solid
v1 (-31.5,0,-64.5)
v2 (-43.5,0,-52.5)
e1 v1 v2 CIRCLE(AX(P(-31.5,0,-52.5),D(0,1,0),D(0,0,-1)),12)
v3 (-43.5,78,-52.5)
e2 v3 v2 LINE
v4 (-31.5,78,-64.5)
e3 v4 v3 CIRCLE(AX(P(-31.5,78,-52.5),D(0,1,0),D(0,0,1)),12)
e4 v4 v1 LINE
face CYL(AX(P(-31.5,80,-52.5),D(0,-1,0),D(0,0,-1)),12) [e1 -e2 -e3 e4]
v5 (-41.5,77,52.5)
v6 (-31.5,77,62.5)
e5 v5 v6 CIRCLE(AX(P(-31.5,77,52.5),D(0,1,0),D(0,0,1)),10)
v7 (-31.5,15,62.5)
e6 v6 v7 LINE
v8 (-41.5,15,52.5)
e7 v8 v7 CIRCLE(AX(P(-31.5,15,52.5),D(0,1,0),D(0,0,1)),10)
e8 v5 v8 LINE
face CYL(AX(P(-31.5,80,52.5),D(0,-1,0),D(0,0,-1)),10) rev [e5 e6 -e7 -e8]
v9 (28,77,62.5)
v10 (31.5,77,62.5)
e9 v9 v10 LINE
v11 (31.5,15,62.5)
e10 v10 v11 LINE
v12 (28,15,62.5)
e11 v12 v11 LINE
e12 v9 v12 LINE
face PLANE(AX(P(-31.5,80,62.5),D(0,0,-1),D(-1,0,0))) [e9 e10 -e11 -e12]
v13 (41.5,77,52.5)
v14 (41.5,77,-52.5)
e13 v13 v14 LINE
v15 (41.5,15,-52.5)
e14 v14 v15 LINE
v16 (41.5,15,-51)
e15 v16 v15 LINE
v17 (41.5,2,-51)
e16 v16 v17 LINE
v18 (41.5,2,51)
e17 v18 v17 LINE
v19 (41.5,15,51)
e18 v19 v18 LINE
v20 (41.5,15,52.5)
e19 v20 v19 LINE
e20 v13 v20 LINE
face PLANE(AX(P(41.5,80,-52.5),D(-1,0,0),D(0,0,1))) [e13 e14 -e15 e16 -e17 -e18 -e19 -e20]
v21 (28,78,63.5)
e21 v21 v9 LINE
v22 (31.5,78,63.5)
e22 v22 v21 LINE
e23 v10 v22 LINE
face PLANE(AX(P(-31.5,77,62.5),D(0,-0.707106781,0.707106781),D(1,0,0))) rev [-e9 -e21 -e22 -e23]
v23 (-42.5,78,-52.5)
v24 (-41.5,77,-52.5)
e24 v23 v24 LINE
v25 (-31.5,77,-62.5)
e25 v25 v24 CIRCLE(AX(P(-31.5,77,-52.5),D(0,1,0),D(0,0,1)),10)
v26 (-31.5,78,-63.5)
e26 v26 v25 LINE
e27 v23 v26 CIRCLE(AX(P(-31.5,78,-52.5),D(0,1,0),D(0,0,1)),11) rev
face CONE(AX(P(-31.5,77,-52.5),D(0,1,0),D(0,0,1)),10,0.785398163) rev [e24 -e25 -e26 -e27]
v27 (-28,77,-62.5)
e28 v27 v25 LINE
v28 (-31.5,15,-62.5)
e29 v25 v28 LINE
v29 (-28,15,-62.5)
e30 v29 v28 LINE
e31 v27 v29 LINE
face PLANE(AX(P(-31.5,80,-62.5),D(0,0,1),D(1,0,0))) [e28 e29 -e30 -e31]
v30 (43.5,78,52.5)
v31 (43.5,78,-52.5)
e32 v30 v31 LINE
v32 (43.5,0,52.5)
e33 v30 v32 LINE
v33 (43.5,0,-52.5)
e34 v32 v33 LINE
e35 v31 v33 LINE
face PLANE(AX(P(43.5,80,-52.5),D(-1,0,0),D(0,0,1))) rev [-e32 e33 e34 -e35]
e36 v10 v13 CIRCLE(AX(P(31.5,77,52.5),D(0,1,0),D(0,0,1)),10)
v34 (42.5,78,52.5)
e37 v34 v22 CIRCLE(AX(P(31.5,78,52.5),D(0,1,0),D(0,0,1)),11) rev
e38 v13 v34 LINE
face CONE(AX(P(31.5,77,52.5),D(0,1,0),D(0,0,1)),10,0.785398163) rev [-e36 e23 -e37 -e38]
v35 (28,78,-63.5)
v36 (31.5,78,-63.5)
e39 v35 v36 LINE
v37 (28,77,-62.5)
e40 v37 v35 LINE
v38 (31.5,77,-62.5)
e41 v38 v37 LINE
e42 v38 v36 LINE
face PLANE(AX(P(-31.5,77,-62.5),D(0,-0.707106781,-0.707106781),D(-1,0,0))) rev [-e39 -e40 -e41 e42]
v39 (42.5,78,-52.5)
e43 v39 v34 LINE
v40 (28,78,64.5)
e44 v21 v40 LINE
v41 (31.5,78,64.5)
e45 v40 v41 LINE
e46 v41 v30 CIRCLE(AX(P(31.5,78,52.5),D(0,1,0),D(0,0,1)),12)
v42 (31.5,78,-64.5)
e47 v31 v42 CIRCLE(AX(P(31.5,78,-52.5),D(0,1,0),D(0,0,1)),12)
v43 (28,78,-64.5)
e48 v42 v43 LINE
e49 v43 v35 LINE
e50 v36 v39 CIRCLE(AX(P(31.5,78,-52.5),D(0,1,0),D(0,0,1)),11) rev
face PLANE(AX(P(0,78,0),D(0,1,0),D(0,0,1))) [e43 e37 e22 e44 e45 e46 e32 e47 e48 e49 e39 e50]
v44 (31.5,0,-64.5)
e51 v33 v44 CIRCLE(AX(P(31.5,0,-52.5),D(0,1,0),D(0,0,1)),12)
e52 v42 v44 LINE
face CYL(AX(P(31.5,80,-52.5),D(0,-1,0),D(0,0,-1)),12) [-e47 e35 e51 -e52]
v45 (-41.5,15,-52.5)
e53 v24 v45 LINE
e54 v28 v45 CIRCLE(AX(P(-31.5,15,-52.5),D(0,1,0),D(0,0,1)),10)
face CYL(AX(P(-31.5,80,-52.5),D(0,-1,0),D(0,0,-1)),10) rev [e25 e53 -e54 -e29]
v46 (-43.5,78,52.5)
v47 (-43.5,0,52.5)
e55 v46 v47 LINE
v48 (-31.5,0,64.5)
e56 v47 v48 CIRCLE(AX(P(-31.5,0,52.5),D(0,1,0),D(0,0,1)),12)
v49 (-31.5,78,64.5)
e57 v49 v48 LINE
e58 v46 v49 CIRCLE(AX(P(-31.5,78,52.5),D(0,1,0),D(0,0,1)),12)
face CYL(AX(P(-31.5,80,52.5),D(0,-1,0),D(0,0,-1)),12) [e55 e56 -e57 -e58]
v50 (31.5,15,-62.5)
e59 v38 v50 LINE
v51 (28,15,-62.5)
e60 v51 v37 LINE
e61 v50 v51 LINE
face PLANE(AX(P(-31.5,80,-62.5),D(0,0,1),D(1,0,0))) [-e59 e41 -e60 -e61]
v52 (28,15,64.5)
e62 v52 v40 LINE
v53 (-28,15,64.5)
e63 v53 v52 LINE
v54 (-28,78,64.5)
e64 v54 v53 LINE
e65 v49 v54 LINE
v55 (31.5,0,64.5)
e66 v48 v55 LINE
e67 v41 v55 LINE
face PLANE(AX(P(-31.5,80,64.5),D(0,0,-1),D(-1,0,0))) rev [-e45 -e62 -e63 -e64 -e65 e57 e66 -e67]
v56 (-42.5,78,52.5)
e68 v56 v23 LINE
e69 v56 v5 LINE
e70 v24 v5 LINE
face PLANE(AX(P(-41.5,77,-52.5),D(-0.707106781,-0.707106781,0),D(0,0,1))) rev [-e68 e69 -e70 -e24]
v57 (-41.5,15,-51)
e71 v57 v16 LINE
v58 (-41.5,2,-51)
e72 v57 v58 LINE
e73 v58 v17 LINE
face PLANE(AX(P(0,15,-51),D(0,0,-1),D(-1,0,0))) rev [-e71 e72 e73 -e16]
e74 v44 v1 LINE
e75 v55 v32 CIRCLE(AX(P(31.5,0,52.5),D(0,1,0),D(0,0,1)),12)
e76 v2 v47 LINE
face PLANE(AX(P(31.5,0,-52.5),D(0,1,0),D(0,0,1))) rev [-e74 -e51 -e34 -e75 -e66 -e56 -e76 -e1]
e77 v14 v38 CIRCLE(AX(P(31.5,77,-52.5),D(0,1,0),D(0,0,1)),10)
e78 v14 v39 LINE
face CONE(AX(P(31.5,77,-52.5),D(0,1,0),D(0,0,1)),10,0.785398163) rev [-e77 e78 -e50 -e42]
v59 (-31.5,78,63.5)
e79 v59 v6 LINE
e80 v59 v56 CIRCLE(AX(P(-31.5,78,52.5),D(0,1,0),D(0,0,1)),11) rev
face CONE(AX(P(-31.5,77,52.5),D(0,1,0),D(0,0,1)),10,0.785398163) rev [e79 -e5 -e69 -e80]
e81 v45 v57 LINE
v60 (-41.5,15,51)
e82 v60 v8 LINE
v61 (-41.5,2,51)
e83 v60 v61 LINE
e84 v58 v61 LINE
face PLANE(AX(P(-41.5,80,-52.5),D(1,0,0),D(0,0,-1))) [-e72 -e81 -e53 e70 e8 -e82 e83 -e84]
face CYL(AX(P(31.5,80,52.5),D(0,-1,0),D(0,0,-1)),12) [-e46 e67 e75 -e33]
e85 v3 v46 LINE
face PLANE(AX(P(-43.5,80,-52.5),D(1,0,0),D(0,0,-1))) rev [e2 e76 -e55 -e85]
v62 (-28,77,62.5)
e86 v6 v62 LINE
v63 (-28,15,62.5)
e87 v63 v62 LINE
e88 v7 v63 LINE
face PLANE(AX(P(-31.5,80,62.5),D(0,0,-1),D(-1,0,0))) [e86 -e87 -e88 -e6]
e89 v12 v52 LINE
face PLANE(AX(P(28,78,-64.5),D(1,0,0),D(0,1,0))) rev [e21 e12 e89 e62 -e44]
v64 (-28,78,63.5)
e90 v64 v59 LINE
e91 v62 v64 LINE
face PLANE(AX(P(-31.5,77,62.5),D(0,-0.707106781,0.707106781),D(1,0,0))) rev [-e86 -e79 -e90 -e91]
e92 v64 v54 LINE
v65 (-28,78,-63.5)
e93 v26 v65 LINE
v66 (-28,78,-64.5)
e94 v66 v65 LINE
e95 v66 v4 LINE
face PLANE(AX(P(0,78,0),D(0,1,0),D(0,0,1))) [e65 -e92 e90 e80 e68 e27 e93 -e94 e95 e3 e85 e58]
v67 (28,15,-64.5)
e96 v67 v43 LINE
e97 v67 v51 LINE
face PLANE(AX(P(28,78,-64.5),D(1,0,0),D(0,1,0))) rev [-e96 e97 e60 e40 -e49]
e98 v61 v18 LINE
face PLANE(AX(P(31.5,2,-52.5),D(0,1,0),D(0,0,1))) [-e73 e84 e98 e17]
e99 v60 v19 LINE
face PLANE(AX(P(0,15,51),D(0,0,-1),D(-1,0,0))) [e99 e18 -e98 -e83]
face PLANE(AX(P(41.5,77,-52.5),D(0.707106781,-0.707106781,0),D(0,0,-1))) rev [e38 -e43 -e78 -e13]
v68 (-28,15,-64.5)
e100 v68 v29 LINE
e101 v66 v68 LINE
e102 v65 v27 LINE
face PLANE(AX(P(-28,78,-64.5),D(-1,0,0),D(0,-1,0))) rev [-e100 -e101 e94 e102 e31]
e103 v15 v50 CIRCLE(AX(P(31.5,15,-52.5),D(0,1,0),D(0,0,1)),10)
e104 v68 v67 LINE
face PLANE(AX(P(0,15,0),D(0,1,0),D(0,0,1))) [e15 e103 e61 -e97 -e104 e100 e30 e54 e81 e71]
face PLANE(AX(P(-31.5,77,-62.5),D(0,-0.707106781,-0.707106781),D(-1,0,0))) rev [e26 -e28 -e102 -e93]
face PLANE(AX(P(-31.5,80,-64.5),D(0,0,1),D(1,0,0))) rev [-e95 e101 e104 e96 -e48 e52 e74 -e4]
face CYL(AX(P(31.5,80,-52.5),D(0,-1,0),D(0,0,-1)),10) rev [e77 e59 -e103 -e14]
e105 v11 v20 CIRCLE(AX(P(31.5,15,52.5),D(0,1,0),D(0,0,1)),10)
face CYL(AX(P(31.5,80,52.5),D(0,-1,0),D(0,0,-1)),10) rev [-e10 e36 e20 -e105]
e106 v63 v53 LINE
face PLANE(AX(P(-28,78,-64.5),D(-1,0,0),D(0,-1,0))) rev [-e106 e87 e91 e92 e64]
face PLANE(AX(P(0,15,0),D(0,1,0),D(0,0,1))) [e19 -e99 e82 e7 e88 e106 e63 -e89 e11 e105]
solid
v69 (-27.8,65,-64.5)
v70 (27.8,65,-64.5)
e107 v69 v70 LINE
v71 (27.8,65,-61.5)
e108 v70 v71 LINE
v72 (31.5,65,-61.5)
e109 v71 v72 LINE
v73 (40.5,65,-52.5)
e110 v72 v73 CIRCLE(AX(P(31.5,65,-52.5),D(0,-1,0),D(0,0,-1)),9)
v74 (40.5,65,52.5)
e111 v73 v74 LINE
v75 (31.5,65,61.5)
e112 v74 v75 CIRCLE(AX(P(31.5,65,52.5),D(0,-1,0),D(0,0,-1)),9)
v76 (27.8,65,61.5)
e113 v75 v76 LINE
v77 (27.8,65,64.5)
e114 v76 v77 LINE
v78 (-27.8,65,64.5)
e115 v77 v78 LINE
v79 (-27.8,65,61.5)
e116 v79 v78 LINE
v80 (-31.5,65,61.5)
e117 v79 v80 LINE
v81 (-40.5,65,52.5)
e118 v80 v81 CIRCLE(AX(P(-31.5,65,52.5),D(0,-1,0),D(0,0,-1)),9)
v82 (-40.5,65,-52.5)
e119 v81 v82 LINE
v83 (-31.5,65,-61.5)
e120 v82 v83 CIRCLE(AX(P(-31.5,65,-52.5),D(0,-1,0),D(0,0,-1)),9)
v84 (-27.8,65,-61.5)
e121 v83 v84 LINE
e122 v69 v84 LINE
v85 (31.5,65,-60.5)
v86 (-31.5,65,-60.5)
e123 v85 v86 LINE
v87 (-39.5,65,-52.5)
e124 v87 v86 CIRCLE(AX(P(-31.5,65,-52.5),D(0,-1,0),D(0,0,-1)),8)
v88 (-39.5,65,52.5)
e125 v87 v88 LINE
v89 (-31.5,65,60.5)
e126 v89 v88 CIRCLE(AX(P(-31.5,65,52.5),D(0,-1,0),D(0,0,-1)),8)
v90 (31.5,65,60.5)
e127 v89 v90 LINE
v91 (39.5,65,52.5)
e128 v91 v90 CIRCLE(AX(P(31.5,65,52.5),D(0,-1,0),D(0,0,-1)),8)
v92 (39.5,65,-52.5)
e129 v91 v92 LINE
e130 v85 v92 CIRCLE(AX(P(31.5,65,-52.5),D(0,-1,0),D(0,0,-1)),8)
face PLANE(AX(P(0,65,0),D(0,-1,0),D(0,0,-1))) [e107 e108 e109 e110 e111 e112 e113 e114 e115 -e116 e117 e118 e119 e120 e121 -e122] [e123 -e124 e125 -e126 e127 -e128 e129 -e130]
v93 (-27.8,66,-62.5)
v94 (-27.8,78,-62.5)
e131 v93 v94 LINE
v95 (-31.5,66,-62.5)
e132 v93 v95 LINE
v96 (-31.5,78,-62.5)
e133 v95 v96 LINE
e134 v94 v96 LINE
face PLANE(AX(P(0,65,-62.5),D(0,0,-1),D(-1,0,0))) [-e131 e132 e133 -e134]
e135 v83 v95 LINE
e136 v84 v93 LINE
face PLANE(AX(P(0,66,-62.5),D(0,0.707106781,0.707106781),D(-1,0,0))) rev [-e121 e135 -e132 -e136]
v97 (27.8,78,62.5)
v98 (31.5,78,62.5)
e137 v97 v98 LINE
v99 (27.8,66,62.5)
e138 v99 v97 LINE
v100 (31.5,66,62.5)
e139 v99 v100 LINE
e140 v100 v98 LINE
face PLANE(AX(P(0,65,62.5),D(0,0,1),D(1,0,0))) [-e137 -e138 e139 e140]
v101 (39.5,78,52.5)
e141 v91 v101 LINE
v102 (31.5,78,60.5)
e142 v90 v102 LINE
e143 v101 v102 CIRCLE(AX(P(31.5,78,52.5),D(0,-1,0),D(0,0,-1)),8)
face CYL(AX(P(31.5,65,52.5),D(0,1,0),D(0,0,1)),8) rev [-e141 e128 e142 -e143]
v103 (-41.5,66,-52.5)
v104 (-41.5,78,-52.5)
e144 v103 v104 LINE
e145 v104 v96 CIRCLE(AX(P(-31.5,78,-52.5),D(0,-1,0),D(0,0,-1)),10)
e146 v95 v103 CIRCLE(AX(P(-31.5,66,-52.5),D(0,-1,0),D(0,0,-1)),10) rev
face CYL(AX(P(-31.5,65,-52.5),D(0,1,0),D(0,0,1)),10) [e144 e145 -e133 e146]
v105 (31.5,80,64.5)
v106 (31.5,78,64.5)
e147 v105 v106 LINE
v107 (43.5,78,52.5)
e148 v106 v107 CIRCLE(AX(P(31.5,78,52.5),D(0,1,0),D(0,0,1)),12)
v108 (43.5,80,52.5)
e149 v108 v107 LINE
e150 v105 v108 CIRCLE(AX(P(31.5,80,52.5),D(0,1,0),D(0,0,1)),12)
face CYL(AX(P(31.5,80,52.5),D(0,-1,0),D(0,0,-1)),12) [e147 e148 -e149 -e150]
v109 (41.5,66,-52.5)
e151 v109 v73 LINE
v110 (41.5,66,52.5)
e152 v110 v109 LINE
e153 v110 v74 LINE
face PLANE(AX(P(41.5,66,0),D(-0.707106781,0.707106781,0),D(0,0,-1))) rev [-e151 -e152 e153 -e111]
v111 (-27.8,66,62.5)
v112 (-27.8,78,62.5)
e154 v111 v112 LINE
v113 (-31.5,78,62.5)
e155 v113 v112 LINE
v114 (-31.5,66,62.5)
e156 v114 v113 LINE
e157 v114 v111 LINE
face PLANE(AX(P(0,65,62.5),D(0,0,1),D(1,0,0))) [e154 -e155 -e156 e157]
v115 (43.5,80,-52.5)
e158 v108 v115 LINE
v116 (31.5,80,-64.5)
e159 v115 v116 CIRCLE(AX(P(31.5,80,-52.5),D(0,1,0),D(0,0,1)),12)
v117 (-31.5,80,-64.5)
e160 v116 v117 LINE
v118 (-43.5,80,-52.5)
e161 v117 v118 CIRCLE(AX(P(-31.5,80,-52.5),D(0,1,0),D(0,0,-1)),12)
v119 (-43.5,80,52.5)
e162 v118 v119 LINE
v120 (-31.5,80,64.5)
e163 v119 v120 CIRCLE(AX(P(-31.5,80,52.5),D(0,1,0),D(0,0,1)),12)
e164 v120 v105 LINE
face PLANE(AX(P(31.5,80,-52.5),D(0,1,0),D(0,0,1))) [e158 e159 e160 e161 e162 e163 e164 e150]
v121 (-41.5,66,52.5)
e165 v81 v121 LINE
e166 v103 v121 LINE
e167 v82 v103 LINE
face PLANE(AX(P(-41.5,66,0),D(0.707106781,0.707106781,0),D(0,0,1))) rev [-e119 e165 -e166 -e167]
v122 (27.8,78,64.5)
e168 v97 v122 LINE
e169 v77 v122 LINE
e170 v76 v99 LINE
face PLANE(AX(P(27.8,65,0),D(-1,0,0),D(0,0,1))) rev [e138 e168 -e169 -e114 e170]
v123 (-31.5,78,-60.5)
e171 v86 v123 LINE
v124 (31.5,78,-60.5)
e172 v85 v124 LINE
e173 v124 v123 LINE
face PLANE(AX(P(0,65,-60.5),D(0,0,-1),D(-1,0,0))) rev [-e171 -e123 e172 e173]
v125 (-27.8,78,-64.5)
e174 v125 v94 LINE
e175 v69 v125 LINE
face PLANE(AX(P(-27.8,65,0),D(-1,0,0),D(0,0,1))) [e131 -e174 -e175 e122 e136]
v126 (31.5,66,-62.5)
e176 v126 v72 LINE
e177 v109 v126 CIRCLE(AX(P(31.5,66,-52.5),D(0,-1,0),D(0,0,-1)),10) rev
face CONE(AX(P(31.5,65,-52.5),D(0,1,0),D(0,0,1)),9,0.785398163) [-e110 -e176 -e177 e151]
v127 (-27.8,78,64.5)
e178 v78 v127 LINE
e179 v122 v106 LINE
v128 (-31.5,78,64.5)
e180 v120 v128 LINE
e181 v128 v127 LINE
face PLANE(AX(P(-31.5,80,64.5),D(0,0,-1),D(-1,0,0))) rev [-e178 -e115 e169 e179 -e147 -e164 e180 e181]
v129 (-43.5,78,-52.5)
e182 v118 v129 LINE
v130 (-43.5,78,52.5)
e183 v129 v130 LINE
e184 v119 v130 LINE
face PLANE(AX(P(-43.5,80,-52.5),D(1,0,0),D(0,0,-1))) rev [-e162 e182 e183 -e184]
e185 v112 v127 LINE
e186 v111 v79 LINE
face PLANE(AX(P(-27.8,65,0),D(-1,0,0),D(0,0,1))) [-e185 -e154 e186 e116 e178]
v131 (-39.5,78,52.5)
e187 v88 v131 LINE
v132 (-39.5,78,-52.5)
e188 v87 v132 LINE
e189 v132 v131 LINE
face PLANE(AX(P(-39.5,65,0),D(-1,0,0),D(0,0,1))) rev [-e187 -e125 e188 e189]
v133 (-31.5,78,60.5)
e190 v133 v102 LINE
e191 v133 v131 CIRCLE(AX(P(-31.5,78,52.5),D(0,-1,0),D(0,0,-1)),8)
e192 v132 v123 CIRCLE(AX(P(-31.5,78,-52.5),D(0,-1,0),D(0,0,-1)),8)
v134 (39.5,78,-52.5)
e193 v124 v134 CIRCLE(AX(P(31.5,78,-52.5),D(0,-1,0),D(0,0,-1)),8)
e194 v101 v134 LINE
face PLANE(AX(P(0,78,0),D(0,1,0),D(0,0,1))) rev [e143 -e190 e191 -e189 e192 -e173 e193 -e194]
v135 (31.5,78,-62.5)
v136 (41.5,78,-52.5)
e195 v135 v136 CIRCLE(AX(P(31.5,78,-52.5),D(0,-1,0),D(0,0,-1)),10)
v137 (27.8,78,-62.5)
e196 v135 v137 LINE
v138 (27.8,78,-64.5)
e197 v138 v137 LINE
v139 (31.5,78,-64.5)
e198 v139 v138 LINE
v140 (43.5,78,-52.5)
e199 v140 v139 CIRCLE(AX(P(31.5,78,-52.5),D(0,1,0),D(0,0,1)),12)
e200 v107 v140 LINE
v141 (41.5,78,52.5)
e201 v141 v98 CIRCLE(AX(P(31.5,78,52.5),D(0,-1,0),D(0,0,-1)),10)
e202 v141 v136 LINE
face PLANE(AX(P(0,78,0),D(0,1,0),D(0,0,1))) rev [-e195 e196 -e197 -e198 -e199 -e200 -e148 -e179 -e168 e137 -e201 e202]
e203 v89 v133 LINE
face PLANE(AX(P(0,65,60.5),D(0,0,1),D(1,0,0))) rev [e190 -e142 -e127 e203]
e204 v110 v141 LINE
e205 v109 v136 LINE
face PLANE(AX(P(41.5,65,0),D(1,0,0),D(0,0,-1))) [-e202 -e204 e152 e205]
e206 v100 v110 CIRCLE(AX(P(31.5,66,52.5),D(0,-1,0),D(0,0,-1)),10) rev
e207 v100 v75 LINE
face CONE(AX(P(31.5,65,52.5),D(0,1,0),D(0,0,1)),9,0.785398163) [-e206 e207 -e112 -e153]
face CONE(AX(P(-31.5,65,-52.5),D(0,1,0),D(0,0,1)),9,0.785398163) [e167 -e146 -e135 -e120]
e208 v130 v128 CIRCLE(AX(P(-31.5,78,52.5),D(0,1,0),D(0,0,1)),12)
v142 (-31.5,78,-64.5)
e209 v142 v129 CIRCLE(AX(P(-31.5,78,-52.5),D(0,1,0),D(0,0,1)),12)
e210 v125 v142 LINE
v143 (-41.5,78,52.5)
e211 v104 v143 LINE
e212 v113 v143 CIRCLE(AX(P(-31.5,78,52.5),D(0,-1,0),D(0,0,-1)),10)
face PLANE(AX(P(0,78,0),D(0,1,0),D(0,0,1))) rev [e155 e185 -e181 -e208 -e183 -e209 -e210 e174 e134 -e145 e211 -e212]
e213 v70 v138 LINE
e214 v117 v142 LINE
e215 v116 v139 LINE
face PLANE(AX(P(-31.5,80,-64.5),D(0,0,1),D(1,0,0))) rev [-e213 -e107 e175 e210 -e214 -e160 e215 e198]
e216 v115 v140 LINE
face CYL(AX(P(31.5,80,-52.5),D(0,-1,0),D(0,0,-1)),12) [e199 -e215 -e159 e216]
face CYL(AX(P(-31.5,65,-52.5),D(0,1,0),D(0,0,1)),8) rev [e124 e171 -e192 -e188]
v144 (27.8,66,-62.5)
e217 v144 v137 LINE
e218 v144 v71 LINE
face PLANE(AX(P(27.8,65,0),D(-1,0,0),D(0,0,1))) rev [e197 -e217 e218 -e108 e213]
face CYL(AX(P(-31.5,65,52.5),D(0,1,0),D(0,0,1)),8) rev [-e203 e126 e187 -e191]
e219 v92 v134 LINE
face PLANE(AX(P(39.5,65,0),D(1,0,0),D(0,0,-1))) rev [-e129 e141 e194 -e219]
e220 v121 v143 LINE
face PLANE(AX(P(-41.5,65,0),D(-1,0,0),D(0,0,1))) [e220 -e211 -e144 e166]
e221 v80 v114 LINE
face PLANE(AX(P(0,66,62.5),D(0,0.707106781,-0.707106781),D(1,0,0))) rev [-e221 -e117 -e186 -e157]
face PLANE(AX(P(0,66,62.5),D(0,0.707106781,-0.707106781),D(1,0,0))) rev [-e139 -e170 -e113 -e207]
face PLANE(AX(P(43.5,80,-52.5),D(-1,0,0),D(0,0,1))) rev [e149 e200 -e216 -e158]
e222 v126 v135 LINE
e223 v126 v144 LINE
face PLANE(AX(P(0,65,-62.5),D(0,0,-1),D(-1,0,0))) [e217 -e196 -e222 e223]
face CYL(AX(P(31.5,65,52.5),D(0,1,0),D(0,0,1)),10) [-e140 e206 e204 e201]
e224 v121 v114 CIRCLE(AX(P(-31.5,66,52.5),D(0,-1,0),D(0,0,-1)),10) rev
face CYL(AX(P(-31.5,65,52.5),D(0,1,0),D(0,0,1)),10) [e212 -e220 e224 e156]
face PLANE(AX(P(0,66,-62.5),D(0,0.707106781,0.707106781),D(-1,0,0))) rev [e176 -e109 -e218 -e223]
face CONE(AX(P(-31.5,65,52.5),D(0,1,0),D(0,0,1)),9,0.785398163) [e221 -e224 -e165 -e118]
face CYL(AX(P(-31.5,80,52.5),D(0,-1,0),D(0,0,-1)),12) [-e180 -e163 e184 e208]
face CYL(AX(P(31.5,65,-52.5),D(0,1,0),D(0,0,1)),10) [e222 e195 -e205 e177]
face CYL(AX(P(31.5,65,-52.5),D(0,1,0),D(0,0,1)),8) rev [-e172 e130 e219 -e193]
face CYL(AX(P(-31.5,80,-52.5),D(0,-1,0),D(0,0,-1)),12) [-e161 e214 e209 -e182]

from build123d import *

# Parameters (mm, degrees)
BOSS_EXTRUDE1_DEPTH = 80
SHELL1_T            = -2
SKETCH2_W           = 83
SKETCH2_H           = 1.5
BOSS_EXTRUDE2_DEPTH = 13
SKETCH4_W           = 55.6
SKETCH4_H           = 2
BOSS_EXTRUDE3_DEPTH = 13
CHAMFER1_SIZE       = 1
SKETCH3_W           = 56
SKETCH3_H           = 63
CUT_EXTRUDE1_DEPTH  = 158.902659889
CHAMFER2_SIZE       = 1


with BuildPart() as part:
    # Sketch1 → Boss-Extrude1 (new body)
    with BuildSketch(Plane(origin=(0, 0, 0), x_dir=(1, 0, 0), z_dir=(0, 1, 0))):
        with BuildLine():
            Line((43.5, 52.5), (43.5, -52.5))
            ThreePointArc((43.5, -52.5), (39.985281374, -60.985281374), (31.5, -64.5))
            Line((31.5, -64.5), (-31.5, -64.5))
            ThreePointArc((-31.5, -64.5), (-39.985281374, -60.985281374), (-43.5, -52.5))
            Line((-43.5, -52.5), (-43.5, 52.5))
            ThreePointArc((-43.5, 52.5), (-39.985281374, 60.985281374), (-31.5, 64.5))
            Line((-31.5, 64.5), (31.5, 64.5))
            ThreePointArc((31.5, 64.5), (39.985281374, 60.985281374), (43.5, 52.5))
        make_face()
    extrude(amount=BOSS_EXTRUDE1_DEPTH)


with BuildPart() as body_2:
    # Split1: the piece on the far side of the plane
    add(part.part)
    split(bisect_by=Plane.ZX.offset(78), keep=Keep.BOTTOM)

    # Shell1
    shell1_openings = [body_2.faces().sort_by_distance(p)[0] for p in [
        (0, 78, 0),
    ]]
    offset(amount=SHELL1_T, openings=shell1_openings, kind=Kind.INTERSECTION)

    # Sketch2 → Boss-Extrude2 (add)
    with BuildSketch(Plane(origin=(0, 2, 0), x_dir=(1, 0, 0), z_dir=(0, 1, 0))):
        with Locations((0, 51.75)):
            Rectangle(SKETCH2_W, SKETCH2_H)
        with BuildLine():
            Line((-41.5, 52.5), (41.5, 52.5))
            ThreePointArc((41.5, 52.5), (38.571067812, 59.571067812), (31.5, 62.5))
            Line((31.5, 62.5), (-31.5, 62.5))
            ThreePointArc((-31.5, 62.5), (-38.571067812, 59.571067812), (-41.5, 52.5))
        make_face()
        with BuildLine():
            Line((-41.5, -52.5), (41.5, -52.5))
            ThreePointArc((41.5, -52.5), (38.571067812, -59.571067812), (31.5, -62.5))
            Line((31.5, -62.5), (-31.5, -62.5))
            ThreePointArc((-31.5, -62.5), (-38.571067812, -59.571067812), (-41.5, -52.5))
        make_face()
        with Locations((0, -51.75)):
            Rectangle(SKETCH2_W, SKETCH2_H)
    extrude(amount=BOSS_EXTRUDE2_DEPTH)

    # Sketch3 → Cut-Extrude1 (cut, through all)
    with BuildSketch(Plane.XY.offset(64.5)):
        with Locations((0, 46.5)):
            Rectangle(SKETCH3_W, SKETCH3_H)
    extrude(amount=-CUT_EXTRUDE1_DEPTH, mode=Mode.SUBTRACT)

    # Chamfer2
    chamfer2_edges = [body_2.edges().sort_by_distance(p)[0] for p in [
        (41.5, 78, 0),
        (38.571067812, 78, -59.571067812),
        (29.75, 78, -62.5),
        (-38.571067812, 78, -59.571067812),
        (-41.5, 78, 0),
        (-38.571067812, 78, 59.571067812),
        (-29.75, 78, 62.5),
        (38.571067812, 78, 59.571067812),
        (29.75, 78, 62.5),
        (-29.75, 78, -62.5),
    ]]
    chamfer(chamfer2_edges, length=CHAMFER2_SIZE)


with BuildPart() as part_1:
    add(part.part)

    # Split1
    split(bisect_by=Plane.ZX.offset(78), keep=Keep.TOP)

    # Sketch4 → Boss-Extrude3 (add)
    # profile 1 of 3: a face of its own
    with BuildSketch(Plane.XZ.offset(-78)):
        with BuildLine():
            Line((31.5, -62.5), (-31.5, -62.5))
            ThreePointArc((-31.5, -62.5), (-38.571067812, -59.571067812), (-41.5, -52.5))
            Line((-41.5, -52.5), (-41.5, 52.5))
            ThreePointArc((-41.5, 52.5), (-38.571067812, 59.571067812), (-31.5, 62.5))
            Line((-31.5, 62.5), (31.5, 62.5))
            ThreePointArc((31.5, 62.5), (38.571067812, 59.571067812), (41.5, 52.5))
            Line((41.5, 52.5), (41.5, -52.5))
            ThreePointArc((41.5, -52.5), (38.571067812, -59.571067812), (31.5, -62.5))
        make_face()
        with BuildLine():
            ThreePointArc((39.5, 52.5), (37.156854249, 58.156854249), (31.5, 60.5))
            Line((31.5, 60.5), (-31.5, 60.5))
            ThreePointArc((-31.5, 60.5), (-37.156854249, 58.156854249), (-39.5, 52.5))
            Line((-39.5, 52.5), (-39.5, -52.5))
            ThreePointArc((-39.5, -52.5), (-37.156854249, -58.156854249), (-31.5, -60.5))
            Line((-31.5, -60.5), (31.5, -60.5))
            ThreePointArc((31.5, -60.5), (37.156854249, -58.156854249), (39.5, -52.5))
            Line((39.5, -52.5), (39.5, 52.5))
        make_face(mode=Mode.SUBTRACT)
    # profile 2 of 3: a face of its own
    with BuildSketch(Plane.XZ.offset(-78)):
        with Locations((0, 63.5)):
            Rectangle(SKETCH4_W, SKETCH4_H)
    # profile 3 of 3: a face of its own
    with BuildSketch(Plane.XZ.offset(-78)):
        with Locations((0, -63.5)):
            Rectangle(SKETCH4_W, SKETCH4_H)
    extrude(amount=BOSS_EXTRUDE3_DEPTH)

    # Chamfer1
    chamfer1_edges = [part_1.edges().sort_by_distance(p)[0] for p in [
        (29.65, 65, -62.5),
        (41.5, 65, 0),
        (29.65, 65, 62.5),
        (-29.65, 65, 62.5),
        (-41.5, 65, 0),
        (-29.65, 65, -62.5),
        (38.571067812, 65, -59.571067812),
        (38.571067812, 65, 59.571067812),
        (-38.571067812, 65, 59.571067812),
        (-38.571067812, 65, -59.571067812),
    ]]
    chamfer(chamfer1_edges, length=CHAMFER1_SIZE)


solid = Compound([body_2.part, part_1.part])
